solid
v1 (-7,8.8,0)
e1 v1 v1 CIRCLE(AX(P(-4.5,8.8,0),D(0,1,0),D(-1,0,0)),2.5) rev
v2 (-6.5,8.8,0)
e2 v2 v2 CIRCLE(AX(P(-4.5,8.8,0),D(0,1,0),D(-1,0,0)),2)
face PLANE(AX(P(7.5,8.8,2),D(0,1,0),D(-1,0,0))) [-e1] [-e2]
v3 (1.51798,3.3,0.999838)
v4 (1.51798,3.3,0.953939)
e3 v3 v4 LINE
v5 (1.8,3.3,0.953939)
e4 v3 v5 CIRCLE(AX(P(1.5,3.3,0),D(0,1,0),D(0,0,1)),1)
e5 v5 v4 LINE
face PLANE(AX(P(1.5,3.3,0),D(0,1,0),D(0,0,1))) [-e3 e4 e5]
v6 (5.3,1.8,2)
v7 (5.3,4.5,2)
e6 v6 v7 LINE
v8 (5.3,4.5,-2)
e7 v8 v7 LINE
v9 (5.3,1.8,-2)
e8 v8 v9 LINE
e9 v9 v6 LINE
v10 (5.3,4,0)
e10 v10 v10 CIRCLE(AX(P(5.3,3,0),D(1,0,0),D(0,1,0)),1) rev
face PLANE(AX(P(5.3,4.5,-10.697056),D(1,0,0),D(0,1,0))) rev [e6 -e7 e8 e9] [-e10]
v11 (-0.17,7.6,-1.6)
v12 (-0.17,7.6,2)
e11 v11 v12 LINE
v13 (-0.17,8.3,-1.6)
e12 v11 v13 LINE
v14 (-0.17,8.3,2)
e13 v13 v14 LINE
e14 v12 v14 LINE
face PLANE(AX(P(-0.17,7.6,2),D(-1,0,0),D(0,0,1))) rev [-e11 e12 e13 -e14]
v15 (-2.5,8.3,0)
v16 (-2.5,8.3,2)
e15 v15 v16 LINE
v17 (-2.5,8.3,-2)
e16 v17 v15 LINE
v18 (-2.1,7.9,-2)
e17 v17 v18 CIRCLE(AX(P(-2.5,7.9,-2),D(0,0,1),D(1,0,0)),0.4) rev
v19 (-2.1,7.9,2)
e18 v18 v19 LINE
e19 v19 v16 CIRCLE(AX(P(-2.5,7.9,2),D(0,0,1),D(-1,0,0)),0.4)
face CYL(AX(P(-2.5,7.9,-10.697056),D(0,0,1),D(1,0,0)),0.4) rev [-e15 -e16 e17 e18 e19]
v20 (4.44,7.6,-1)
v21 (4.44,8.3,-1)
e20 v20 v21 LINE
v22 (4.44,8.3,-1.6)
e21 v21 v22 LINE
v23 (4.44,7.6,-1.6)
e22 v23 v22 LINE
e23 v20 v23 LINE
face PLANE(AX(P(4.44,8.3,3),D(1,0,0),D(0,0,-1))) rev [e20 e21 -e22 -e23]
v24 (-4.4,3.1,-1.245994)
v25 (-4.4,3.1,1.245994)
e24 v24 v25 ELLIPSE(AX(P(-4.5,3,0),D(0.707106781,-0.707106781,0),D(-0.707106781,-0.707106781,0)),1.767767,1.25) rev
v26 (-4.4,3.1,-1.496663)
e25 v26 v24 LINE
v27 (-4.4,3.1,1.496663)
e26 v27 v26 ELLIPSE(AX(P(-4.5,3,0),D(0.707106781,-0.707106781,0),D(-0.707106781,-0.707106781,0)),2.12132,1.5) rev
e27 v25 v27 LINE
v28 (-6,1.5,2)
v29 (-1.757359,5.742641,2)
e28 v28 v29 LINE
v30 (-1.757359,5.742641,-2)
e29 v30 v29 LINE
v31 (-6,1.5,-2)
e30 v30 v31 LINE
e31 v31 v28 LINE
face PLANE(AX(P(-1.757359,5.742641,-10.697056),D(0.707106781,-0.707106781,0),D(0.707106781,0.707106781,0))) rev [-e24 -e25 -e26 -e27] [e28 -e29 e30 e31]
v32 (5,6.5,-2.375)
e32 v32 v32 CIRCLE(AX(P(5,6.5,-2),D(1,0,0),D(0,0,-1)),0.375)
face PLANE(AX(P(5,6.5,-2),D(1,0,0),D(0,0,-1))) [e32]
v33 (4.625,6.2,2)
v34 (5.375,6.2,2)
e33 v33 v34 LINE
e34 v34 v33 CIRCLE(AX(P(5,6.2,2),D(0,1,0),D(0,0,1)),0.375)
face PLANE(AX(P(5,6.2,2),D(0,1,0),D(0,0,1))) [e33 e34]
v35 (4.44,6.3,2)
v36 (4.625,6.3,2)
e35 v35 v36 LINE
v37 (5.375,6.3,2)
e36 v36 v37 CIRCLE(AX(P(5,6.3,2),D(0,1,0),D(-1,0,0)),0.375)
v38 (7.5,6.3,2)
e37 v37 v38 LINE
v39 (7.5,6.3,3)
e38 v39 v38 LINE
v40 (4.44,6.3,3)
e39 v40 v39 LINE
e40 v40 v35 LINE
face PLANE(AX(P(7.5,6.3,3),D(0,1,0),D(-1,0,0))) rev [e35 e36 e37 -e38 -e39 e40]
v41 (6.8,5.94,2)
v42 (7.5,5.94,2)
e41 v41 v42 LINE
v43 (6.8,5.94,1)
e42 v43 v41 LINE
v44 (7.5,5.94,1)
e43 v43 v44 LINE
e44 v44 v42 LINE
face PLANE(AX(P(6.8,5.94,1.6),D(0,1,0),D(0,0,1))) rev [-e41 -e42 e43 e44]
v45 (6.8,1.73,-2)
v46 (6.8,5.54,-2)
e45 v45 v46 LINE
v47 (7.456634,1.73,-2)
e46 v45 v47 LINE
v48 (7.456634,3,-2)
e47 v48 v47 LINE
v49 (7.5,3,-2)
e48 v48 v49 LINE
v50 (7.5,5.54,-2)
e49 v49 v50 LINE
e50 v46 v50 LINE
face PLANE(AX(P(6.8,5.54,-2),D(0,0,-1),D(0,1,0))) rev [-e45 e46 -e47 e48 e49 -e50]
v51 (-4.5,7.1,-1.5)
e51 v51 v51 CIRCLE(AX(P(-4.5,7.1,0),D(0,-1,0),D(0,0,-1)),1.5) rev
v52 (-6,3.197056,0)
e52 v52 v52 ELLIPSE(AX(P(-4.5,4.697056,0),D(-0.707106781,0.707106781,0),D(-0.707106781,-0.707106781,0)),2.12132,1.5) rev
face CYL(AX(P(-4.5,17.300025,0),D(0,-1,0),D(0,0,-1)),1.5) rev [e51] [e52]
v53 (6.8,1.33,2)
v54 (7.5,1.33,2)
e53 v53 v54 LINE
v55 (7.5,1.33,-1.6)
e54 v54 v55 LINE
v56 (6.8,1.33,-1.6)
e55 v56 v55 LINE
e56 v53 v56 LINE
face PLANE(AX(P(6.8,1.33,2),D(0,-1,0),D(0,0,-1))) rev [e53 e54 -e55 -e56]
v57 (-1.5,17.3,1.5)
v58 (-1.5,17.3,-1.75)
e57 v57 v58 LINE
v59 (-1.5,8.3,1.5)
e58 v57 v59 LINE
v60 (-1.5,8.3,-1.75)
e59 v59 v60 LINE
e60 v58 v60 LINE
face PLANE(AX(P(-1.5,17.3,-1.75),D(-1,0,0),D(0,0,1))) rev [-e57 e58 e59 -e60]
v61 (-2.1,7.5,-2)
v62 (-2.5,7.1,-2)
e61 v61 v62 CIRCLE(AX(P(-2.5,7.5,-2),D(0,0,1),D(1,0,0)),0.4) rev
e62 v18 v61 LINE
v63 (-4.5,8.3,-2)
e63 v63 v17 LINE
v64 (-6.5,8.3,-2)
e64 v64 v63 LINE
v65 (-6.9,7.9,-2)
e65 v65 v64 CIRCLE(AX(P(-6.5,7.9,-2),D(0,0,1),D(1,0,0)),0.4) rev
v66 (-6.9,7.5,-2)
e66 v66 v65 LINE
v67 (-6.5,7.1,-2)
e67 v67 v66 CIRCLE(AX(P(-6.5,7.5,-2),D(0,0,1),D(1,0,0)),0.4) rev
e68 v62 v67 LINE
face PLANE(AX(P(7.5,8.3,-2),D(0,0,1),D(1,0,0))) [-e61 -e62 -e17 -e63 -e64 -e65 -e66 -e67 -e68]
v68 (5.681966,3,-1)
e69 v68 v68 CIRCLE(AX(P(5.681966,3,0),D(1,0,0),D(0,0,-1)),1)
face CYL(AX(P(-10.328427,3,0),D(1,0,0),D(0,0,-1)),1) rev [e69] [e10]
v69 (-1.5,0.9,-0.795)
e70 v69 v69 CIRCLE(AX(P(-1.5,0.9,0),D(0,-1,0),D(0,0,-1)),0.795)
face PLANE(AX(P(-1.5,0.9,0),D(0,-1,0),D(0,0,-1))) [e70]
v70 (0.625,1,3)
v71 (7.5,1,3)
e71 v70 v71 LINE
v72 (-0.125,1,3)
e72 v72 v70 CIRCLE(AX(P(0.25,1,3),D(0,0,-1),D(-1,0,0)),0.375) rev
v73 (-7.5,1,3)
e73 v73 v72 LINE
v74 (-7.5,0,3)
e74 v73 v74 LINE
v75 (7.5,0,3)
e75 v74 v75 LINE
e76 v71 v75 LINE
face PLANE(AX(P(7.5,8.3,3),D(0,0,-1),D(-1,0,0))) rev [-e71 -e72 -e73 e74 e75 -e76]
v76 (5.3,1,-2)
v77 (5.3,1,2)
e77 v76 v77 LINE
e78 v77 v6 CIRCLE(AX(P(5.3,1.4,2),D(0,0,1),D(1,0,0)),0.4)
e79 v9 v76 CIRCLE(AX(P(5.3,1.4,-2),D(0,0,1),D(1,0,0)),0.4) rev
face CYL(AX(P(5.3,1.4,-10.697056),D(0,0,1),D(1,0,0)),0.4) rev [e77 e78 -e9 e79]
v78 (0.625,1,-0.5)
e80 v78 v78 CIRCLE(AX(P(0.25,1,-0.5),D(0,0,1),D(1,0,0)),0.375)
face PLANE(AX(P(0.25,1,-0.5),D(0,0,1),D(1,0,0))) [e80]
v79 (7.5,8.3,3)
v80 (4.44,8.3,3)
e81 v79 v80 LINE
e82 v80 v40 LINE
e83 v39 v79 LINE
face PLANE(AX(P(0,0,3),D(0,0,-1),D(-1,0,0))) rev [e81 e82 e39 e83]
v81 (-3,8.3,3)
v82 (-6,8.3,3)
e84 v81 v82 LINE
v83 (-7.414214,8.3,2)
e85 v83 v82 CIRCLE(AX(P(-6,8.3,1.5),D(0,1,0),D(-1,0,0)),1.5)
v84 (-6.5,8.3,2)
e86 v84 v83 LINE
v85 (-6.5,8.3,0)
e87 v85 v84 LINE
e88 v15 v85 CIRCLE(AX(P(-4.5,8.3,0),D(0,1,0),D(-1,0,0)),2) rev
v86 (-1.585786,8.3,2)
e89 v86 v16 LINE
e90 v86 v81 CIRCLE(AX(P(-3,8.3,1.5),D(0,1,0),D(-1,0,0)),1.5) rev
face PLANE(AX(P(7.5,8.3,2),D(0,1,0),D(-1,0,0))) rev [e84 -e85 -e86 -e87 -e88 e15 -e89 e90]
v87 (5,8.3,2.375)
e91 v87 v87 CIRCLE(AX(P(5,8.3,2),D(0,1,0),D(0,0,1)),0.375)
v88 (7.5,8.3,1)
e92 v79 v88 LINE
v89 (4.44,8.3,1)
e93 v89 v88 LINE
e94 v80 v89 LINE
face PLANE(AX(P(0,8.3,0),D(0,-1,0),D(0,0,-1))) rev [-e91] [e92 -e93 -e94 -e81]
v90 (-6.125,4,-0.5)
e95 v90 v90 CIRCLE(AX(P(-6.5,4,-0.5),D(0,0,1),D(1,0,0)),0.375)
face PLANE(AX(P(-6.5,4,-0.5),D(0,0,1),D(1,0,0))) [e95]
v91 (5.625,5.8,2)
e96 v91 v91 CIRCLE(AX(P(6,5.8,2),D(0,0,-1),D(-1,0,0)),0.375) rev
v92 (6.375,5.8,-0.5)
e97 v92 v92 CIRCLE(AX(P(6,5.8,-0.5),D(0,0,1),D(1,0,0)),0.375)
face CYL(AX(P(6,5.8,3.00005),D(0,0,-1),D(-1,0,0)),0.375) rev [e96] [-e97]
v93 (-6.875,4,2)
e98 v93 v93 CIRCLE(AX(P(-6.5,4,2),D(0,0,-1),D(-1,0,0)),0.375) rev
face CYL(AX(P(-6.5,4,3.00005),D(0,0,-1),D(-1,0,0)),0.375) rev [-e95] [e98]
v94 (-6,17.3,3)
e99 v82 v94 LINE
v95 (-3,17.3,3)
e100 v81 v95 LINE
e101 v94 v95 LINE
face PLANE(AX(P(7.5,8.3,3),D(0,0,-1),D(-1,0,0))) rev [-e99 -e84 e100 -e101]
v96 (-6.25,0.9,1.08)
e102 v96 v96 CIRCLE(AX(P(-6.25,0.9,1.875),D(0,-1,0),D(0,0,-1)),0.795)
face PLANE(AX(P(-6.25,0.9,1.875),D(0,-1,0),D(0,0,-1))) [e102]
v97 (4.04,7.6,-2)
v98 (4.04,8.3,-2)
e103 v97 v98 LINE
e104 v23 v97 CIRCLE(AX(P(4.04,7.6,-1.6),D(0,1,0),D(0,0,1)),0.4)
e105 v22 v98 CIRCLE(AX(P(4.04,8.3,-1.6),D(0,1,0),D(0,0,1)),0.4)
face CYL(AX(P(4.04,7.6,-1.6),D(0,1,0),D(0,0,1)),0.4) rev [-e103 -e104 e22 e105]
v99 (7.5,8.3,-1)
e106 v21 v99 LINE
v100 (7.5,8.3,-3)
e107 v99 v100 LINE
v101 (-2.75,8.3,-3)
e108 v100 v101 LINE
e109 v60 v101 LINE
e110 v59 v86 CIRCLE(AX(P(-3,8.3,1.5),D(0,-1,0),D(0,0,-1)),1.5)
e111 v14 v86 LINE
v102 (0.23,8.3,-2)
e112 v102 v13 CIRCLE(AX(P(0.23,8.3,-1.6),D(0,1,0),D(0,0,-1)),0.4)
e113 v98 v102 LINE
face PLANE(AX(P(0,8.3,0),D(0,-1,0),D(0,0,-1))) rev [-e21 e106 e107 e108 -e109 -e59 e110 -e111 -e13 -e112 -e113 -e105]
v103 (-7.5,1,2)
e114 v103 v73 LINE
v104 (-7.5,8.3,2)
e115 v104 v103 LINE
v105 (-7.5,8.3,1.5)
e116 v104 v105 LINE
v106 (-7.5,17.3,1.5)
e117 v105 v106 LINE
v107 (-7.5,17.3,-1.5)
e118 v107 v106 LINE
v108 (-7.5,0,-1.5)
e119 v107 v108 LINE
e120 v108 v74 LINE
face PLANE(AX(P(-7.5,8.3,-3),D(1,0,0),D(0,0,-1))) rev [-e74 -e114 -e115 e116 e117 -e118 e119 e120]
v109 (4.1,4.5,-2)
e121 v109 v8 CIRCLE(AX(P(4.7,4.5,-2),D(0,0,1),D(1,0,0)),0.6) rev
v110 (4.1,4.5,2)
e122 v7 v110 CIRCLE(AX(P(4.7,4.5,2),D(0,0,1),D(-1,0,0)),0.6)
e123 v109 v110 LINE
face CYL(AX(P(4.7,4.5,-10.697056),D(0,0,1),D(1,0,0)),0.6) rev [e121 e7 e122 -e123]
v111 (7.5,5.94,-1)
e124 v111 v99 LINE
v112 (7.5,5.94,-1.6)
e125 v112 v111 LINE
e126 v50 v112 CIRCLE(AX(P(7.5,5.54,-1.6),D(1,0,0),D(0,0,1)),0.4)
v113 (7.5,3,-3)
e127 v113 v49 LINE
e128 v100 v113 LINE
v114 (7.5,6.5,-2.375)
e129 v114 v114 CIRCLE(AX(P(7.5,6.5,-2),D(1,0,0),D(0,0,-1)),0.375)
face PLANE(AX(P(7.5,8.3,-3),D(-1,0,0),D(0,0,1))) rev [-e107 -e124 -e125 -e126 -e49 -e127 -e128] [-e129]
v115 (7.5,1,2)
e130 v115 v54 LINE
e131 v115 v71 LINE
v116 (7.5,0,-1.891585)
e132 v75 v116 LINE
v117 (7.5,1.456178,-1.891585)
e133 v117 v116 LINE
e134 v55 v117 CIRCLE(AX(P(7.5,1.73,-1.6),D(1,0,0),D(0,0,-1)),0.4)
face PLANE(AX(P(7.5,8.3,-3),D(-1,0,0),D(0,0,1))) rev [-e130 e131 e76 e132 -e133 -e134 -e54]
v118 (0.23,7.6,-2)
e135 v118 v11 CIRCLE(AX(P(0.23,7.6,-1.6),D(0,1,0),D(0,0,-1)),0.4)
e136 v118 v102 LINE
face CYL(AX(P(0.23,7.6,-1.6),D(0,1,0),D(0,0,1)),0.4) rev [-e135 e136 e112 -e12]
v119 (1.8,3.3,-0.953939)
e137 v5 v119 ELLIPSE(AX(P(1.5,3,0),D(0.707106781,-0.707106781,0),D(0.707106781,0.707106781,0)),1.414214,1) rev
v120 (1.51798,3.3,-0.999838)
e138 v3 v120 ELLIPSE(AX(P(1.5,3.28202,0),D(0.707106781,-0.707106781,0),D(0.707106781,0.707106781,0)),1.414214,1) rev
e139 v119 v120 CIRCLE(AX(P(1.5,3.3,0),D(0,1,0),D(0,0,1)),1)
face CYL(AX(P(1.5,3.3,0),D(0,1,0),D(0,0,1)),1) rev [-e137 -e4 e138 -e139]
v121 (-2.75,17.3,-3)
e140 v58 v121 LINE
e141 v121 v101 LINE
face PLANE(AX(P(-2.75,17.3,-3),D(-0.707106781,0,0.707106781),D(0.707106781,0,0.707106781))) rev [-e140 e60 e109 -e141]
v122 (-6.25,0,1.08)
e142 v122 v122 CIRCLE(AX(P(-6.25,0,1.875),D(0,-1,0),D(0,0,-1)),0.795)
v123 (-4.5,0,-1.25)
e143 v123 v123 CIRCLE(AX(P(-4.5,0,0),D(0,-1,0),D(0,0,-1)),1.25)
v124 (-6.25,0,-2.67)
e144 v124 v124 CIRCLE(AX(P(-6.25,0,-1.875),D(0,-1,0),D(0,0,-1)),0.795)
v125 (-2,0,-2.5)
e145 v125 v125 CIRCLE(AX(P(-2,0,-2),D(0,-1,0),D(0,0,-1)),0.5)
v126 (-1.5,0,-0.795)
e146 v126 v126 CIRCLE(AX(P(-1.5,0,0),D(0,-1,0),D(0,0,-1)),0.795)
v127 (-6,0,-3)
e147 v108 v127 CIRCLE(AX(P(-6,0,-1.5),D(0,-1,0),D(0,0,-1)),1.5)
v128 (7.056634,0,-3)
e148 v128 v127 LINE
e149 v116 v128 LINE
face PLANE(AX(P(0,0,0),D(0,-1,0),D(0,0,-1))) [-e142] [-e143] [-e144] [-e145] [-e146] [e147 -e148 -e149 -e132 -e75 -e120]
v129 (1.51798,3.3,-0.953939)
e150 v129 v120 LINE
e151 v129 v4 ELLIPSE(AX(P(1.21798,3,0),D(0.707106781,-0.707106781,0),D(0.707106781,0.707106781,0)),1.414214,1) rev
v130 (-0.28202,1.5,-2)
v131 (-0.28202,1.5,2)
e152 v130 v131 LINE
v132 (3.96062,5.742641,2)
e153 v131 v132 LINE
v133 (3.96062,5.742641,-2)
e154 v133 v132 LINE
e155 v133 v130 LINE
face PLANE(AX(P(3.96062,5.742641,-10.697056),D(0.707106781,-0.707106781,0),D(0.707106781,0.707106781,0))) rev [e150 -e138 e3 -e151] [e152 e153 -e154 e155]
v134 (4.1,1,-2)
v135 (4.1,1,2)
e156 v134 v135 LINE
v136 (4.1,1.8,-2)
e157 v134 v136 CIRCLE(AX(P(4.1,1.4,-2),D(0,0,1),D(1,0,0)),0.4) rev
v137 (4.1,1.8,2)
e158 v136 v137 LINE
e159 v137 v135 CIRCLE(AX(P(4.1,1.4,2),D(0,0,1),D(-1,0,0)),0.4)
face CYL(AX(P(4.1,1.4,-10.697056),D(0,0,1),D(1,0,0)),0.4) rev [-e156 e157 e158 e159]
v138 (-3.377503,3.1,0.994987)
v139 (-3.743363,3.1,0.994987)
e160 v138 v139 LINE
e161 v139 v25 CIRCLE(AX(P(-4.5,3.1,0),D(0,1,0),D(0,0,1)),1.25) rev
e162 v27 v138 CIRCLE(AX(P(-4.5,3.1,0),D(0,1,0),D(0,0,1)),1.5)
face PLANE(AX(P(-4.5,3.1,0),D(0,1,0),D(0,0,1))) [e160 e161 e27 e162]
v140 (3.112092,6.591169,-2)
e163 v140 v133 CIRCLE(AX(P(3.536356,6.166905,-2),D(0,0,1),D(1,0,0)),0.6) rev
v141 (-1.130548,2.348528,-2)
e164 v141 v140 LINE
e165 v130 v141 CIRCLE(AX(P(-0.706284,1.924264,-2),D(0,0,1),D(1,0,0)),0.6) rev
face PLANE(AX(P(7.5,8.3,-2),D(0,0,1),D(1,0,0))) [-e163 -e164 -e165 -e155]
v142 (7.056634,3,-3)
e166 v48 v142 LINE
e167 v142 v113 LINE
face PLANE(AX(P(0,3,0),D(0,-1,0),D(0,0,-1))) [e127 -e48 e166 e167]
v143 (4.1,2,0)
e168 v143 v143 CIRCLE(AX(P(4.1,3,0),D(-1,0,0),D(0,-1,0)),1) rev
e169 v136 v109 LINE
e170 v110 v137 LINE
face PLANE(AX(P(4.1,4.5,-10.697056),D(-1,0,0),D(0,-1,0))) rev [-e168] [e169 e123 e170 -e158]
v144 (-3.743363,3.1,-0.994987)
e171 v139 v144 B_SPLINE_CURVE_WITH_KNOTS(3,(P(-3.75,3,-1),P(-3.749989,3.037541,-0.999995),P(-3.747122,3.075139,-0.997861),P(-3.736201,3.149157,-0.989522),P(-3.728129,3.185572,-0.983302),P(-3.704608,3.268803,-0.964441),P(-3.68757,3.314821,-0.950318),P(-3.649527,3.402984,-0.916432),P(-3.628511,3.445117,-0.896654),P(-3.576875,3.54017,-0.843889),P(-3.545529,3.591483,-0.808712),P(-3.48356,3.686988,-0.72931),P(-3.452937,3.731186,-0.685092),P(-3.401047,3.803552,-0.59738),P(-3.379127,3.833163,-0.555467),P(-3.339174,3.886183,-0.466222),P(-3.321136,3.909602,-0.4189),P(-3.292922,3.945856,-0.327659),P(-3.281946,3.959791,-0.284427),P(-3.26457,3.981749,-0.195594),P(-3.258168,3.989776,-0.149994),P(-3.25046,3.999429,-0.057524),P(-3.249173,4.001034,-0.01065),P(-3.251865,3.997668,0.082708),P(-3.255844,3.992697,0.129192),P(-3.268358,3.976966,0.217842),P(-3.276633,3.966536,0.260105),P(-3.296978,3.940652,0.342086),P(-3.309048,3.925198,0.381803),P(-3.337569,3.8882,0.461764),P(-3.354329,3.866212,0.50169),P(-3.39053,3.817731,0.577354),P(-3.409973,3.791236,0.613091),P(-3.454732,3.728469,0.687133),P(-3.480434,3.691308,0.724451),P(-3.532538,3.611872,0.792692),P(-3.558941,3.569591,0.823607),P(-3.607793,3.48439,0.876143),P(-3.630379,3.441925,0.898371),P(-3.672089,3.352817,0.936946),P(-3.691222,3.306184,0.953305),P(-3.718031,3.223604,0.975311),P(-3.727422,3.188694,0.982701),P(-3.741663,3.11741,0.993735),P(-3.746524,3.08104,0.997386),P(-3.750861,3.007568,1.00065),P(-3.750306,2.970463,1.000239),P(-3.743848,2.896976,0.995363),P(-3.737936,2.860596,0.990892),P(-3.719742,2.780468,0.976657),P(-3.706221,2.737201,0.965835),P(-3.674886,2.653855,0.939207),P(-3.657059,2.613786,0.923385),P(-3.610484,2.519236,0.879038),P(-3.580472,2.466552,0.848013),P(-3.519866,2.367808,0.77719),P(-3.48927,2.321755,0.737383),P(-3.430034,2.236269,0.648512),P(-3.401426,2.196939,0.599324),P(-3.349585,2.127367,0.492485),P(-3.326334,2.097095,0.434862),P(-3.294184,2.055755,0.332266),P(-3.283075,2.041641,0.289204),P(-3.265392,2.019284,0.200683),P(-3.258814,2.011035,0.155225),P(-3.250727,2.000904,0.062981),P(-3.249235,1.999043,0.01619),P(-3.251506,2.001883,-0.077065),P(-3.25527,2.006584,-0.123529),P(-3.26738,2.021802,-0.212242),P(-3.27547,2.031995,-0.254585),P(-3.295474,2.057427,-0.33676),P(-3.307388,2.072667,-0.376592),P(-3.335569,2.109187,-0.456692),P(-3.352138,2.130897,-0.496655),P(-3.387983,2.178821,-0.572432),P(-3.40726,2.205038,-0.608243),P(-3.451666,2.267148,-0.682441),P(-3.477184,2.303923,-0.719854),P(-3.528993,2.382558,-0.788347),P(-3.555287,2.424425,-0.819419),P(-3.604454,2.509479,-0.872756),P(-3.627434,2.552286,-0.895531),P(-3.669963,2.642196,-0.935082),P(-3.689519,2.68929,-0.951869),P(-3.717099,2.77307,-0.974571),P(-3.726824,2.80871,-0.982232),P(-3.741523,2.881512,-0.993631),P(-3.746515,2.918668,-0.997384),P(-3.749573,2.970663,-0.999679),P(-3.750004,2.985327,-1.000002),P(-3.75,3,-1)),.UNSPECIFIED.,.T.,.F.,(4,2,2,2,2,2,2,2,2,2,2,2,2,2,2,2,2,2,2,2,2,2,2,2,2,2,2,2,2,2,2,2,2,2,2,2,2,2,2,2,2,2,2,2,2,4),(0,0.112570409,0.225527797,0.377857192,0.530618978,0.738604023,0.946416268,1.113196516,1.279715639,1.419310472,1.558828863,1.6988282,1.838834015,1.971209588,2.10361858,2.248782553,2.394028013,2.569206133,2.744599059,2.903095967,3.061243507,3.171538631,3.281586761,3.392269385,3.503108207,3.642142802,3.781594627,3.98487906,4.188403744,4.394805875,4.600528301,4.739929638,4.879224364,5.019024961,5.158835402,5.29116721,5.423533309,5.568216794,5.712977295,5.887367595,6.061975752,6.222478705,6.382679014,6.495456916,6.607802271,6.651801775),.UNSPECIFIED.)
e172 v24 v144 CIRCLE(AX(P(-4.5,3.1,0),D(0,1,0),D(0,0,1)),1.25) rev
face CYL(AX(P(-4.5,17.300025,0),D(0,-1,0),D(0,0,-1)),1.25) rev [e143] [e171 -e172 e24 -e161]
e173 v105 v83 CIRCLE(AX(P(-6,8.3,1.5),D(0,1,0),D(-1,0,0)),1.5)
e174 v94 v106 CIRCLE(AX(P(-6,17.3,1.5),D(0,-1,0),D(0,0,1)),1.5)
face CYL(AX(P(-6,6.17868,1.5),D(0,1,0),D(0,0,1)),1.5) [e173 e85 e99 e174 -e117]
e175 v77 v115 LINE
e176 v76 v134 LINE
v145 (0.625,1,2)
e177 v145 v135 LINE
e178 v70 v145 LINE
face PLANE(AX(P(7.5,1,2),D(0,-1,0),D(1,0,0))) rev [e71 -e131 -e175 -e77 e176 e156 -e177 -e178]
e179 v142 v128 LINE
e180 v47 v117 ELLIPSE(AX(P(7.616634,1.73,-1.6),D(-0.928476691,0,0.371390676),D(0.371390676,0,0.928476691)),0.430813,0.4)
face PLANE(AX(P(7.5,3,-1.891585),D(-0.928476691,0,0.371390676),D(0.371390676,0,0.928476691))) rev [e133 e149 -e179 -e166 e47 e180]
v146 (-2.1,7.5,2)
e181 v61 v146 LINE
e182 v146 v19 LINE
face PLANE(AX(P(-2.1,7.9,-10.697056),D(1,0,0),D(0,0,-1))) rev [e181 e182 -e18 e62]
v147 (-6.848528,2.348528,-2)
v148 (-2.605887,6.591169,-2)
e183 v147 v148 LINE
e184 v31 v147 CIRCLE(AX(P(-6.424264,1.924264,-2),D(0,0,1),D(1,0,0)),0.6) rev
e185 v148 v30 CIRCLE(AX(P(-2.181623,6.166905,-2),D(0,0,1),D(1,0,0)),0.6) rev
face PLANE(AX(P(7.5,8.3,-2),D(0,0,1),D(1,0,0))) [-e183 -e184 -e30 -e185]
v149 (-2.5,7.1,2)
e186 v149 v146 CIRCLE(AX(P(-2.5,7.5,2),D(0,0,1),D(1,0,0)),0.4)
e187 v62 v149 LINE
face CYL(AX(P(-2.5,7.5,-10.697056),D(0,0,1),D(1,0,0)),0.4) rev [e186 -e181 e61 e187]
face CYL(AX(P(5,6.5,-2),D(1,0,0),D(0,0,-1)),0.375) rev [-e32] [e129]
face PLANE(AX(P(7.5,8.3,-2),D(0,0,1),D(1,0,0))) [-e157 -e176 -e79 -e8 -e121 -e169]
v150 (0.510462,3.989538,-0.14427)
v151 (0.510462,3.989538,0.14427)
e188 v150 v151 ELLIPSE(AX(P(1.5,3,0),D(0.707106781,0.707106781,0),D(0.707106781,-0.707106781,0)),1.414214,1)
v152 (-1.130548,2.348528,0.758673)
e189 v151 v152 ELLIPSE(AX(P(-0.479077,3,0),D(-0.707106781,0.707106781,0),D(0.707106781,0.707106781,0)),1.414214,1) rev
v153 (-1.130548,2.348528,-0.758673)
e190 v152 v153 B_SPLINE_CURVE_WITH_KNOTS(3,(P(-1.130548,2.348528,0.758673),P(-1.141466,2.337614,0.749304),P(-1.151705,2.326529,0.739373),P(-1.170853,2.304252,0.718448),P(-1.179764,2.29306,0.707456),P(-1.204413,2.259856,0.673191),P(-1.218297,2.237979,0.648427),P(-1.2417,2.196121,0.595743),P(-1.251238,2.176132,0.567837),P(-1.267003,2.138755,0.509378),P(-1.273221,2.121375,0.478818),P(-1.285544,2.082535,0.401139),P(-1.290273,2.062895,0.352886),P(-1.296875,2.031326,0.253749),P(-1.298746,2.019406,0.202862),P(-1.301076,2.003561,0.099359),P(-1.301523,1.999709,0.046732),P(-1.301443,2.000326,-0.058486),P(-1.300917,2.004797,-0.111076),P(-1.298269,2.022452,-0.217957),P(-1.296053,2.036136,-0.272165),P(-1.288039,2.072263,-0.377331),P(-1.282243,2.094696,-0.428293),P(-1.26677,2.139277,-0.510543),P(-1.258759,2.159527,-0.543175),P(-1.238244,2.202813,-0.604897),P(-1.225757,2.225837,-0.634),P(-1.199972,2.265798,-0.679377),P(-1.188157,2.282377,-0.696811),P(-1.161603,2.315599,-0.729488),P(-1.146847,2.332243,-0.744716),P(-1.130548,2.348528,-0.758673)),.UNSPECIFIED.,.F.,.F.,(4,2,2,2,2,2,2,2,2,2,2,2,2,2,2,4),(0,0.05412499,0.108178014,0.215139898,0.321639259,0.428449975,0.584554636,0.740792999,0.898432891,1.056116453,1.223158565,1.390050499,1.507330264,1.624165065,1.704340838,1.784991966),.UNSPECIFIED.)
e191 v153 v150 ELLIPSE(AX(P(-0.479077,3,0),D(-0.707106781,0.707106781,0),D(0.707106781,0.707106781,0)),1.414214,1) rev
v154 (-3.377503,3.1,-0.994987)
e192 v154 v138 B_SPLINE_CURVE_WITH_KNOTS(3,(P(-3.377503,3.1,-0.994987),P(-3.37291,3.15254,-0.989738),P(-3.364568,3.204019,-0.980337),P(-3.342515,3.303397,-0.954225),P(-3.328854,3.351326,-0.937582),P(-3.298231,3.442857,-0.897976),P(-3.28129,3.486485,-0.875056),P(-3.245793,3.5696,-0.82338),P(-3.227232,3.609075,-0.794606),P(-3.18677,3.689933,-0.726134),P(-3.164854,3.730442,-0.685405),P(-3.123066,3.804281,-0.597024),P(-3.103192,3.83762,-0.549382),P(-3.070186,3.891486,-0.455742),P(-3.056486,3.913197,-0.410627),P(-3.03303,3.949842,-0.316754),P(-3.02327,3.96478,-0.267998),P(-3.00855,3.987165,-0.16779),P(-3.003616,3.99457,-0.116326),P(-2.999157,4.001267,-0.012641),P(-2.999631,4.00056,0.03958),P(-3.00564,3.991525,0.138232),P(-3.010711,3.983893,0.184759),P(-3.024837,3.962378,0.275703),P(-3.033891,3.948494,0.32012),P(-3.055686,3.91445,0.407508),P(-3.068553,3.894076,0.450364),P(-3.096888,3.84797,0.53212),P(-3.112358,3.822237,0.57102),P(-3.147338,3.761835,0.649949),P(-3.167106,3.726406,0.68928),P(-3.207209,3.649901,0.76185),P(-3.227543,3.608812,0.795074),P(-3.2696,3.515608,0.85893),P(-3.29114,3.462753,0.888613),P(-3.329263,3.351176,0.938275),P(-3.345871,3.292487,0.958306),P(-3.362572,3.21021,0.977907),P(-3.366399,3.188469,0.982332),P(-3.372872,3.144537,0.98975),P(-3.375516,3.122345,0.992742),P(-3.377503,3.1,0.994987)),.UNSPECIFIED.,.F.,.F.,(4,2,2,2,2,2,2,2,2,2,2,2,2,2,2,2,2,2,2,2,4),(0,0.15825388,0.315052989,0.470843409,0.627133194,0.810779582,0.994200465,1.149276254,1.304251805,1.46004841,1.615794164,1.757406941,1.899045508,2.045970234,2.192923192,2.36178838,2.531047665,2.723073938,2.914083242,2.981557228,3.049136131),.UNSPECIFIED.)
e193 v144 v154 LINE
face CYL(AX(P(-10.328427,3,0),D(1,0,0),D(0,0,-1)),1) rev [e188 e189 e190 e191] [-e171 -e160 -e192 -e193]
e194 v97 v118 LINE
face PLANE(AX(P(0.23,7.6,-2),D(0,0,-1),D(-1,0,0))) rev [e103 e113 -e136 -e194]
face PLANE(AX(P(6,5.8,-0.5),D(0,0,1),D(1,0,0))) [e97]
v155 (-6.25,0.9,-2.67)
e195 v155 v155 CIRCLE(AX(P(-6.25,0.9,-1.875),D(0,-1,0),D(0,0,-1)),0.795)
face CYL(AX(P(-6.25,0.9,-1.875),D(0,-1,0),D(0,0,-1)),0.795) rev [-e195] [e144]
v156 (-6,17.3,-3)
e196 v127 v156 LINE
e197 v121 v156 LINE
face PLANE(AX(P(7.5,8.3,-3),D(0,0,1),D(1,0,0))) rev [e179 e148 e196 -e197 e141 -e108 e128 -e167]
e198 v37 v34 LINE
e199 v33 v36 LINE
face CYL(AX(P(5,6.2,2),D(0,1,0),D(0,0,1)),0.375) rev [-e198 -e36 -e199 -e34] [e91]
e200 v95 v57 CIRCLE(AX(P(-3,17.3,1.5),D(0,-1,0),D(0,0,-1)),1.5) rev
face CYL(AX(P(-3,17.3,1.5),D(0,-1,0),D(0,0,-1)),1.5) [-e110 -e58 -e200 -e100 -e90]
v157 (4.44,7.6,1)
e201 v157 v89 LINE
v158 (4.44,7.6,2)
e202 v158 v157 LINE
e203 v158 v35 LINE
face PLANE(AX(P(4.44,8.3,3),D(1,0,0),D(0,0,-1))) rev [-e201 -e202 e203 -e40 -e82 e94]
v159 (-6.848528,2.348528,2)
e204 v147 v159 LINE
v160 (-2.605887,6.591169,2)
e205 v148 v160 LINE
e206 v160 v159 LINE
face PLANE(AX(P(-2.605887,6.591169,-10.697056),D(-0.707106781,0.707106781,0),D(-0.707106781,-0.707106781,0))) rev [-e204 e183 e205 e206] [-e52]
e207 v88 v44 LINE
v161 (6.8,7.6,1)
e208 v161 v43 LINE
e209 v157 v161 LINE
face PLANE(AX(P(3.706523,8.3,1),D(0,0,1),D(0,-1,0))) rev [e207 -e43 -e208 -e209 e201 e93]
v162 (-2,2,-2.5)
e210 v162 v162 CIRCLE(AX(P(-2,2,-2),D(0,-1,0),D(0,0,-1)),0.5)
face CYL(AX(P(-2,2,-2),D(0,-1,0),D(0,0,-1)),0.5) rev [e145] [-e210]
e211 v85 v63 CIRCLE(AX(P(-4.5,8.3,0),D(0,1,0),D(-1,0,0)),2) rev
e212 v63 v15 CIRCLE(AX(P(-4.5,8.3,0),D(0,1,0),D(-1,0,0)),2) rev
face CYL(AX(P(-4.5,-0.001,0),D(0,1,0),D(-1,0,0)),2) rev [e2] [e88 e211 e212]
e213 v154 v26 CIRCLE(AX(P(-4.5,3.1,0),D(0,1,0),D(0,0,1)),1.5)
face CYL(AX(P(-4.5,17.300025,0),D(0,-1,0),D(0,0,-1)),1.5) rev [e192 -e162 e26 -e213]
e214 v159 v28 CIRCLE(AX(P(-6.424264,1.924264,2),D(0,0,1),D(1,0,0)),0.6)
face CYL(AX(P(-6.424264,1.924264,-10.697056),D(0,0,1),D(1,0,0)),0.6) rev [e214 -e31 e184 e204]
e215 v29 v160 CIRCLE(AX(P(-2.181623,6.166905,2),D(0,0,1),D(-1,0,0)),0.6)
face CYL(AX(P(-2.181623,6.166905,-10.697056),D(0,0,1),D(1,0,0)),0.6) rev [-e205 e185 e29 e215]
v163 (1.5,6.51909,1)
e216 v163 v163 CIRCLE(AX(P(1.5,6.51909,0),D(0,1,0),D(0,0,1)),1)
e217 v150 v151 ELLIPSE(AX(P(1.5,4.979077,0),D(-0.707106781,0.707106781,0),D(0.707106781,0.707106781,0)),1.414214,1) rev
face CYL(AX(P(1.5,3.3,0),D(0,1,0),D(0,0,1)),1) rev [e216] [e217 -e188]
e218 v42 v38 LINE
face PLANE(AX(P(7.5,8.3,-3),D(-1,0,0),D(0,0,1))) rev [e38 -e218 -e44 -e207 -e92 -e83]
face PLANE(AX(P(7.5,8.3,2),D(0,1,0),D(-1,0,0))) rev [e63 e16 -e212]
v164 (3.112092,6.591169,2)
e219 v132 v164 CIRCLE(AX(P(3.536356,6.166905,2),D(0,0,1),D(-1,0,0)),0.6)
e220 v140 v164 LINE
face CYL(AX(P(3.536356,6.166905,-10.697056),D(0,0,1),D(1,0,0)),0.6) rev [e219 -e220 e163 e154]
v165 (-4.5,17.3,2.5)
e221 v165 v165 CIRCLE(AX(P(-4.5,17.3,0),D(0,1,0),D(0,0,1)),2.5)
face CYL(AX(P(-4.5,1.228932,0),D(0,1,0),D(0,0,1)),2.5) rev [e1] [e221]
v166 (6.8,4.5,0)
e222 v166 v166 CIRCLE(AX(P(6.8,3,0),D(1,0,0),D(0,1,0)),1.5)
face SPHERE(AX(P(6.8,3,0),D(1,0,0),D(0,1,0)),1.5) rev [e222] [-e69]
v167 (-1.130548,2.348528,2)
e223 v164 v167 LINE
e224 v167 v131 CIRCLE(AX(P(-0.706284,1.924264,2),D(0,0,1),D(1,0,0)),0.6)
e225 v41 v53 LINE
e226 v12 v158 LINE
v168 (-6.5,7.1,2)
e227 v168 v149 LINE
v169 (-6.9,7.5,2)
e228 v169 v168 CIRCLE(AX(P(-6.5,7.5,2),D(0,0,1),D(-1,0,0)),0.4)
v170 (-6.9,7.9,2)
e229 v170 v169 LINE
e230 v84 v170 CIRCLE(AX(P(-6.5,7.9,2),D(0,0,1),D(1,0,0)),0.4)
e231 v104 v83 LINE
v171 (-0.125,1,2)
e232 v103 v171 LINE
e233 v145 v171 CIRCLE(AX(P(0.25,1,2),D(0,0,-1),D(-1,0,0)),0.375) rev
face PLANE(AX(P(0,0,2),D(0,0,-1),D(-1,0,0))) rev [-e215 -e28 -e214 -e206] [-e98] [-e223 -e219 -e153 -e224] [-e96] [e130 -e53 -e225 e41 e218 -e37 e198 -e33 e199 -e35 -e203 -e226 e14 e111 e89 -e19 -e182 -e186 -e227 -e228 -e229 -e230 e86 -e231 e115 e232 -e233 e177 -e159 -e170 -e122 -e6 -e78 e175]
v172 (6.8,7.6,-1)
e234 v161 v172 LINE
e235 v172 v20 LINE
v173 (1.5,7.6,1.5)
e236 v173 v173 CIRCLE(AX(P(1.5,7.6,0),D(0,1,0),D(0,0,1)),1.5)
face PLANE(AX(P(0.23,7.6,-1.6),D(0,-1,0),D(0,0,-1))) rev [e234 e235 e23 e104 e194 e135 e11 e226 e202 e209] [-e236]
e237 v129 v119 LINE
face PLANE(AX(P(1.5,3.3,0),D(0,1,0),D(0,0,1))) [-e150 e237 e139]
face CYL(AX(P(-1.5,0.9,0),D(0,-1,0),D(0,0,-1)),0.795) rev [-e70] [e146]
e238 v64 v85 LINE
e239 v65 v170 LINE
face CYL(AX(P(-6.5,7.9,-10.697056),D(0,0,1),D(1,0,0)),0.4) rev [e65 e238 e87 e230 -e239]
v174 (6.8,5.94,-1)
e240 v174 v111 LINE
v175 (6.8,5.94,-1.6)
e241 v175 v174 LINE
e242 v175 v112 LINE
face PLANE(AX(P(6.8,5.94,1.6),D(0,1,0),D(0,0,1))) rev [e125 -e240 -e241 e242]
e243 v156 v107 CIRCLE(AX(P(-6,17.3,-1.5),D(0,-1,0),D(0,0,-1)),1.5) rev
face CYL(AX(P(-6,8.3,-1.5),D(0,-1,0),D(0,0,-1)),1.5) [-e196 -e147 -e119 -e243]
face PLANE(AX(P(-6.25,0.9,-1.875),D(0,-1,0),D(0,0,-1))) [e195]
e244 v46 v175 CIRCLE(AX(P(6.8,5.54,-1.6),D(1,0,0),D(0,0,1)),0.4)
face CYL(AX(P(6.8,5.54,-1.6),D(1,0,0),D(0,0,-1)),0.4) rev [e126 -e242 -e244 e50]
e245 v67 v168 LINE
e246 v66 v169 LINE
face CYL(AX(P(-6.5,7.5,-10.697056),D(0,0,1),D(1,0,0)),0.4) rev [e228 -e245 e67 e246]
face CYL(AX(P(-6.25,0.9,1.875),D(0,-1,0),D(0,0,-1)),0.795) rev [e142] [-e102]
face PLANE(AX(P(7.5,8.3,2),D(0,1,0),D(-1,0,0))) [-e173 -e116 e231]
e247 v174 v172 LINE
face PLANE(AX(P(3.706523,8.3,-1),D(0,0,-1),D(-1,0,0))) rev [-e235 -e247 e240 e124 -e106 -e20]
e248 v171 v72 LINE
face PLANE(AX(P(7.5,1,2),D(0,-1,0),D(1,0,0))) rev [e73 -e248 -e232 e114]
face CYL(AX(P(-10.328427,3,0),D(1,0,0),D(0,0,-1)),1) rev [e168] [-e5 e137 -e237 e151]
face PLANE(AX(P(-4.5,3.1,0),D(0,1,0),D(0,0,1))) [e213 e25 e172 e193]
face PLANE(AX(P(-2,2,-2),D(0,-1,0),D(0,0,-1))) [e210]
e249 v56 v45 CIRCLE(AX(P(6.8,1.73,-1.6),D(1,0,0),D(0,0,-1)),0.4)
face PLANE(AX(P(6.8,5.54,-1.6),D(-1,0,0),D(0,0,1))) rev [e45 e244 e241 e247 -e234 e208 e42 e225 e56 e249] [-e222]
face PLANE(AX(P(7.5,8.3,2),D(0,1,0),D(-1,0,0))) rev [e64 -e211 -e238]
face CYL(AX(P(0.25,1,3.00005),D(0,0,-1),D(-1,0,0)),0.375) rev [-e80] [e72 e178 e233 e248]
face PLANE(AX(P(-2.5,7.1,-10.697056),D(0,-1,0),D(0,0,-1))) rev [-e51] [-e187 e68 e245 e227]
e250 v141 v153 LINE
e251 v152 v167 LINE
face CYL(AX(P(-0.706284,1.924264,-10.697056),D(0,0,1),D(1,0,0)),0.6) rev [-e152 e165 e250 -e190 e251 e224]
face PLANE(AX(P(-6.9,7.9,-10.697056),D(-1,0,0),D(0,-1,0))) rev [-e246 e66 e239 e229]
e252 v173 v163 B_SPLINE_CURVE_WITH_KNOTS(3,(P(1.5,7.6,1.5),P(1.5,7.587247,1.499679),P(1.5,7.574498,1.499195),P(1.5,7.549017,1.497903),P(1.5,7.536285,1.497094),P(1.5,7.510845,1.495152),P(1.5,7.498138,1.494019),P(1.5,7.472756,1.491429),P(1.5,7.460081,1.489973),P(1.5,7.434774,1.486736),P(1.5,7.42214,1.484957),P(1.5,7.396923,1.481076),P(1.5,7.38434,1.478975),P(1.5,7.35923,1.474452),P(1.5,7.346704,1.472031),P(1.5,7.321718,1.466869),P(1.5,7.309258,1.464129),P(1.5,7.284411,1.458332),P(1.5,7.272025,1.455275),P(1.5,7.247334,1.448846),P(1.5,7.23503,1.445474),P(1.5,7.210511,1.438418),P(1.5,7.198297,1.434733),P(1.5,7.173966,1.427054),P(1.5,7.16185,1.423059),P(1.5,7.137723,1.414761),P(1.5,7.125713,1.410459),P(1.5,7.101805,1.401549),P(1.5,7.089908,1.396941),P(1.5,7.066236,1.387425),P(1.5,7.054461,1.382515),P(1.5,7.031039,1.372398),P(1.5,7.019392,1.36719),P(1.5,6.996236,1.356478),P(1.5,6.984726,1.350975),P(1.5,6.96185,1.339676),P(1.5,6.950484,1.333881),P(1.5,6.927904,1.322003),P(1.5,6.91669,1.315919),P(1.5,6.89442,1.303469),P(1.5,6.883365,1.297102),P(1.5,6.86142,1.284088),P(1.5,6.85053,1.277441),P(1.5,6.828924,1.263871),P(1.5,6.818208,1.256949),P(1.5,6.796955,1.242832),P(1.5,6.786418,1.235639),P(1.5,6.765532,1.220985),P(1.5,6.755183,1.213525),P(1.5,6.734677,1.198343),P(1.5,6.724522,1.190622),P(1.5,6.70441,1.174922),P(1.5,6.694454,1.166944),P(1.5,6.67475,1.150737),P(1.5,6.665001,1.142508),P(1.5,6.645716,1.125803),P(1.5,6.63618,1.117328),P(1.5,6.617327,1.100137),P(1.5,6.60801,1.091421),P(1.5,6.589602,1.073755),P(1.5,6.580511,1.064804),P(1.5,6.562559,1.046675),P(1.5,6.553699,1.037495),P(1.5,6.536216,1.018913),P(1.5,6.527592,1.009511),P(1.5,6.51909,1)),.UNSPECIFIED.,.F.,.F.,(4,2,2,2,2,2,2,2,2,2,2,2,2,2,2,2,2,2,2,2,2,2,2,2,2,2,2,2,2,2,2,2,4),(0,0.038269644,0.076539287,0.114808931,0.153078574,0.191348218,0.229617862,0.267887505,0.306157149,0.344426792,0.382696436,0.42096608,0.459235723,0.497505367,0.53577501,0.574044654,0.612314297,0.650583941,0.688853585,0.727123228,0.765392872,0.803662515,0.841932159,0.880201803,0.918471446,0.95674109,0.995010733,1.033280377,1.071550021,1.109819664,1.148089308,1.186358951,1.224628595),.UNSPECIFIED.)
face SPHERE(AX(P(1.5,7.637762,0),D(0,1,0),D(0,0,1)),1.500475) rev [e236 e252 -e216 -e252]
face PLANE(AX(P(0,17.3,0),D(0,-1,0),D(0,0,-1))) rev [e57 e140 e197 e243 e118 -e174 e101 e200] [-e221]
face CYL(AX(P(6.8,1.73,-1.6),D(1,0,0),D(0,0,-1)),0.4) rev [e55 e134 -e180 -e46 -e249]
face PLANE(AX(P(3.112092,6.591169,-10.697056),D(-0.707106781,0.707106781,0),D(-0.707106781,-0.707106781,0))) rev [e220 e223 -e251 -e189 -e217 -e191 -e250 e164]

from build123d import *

# Parameters (mm, degrees)
SKETCH1_W                        = 15
SKETCH1_H                        = 6
MAIN_BODY_EXT_DEPTH              = 8.3
EMISSION_PATH_EXT_DEPTH          = 9
SKETCH3_R                        = 1.25
EMISSION_AND_GRIN_CUT_DEPTH      = 20.092931
SKETCH4_R                        = 1
DRUM_LENS_CUT_DEPTH              = 13
SKETCH41_R                       = 1
ADDTL_LIGHT_SOURCE_DEPTH         = 5
SKETCH5_W                        = 15
SKETCH5_H                        = 7.3
FILTERCOVER_CUT1_DEPTH           = 1
TOP_LED_SCREW_W                  = 3.06
TOP_LED_SCREW_H                  = 2
BOSS_EXTRUDE1_DEPTH              = 1
FILTERSET_CUT2_DEPTH             = 4
SKETCH10_R                       = 2.5
EMISSION_LENS_CUT_DEPTH          = 8.5
SKETCH15_R                       = 0.795
MAGNETS_CUT_DEPTH                = 0.9
SCREW_HOLES_CUT_DEPTH            = 20.507434
SCREW_HOLES_CUT_DEPTH_BACK       = 2.5
SKETCH18_R                       = 0.375
EXTERNAL_FILLET_1_R              = 1.5
VERTICAL_PATH_CUT_DEPTH          = 14.011149
VERTICAL_PATH_CUT_DEPTH_BACK     = 4
SKETCH28_R                       = 1.5
SET_SCREW_NOTCH_DEPTH            = 3
CUT_EXTRUDE_ORIGINAL_LIGHT_DEPTH = 0.7
CUT_EXTRUDE_ADDTL_LIGHT_DEPTH    = 0.7
SKETCH29_R                       = 0.375
SIDE_LED_SCREW_DEPTH             = 2.5
SKETCH32_W                       = 2
SKETCH32_H                       = 2.36
SIDE_WIRE_SLOT_CUT_DEPTH         = 0.7
SKETCH45_W                       = 2.36
SKETCH45_H                       = 2
TOP_LED_SLOT_DEPTH               = 0.7
CUT_EXTRUDE16_DEPTH              = 9
CUT_EXTRUDE17_REACH              = 13.945
SKETCH37_R                       = 2
SKETCH48_R                       = 0.5
PEG_EXTRUDE_DEPTH                = 2
SKETCH51_R                       = 0.375
TOP_LE_SCREW_DEPTH               = 2.1


with BuildPart() as part:
    # Sketch1 → Main Body Ext (new body)
    with BuildSketch(Plane(origin=(0, 0, 0), x_dir=(1, 0, 0), z_dir=(0, 1, 0))):
        Rectangle(SKETCH1_W, SKETCH1_H)
    extrude(amount=MAIN_BODY_EXT_DEPTH)

    # Sketch8 → Emission Path Ext (add)
    with BuildSketch(Plane(origin=(0, 8.3, 0), x_dir=(1, 0, 0), z_dir=(0, 1, 0))):
        Polygon((-2.75, 3), (-1.5, 1.75), (-1.5, -3), (-7.5, -3), (-7.5, 3), align=None)
    extrude(amount=EMISSION_PATH_EXT_DEPTH)

    # Sketch3 → Emission and Grin Cut (cut, through all)
    with BuildSketch(Plane.XZ):
        with Locations(Location((-4.5, 0, 0), (0, 0, 270))):
            Circle(SKETCH3_R)
    extrude(amount=-EMISSION_AND_GRIN_CUT_DEPTH, mode=Mode.SUBTRACT)

    # Sketch4 → Drum Lens Cut (cut)
    with BuildSketch(Plane(origin=(7.5, 0, 0), x_dir=(0, 0, -1), z_dir=(1, 0, 0))):
        with Locations((0, 3)):
            Circle(SKETCH4_R)
    extrude(amount=-DRUM_LENS_CUT_DEPTH, mode=Mode.SUBTRACT)

    # Sketch41 → Addtl Light Source (cut)
    with BuildSketch(Plane(origin=(0, 8.3, 0), x_dir=(1, 0, 0), z_dir=(0, 1, 0))):
        with Locations(Location((1.5, 0, 0), (0, 0, 270))):
            Circle(SKETCH41_R)
    extrude(amount=-ADDTL_LIGHT_SOURCE_DEPTH, mode=Mode.SUBTRACT)

    # Sketch5 → FilterCover Cut1 (cut)
    with BuildSketch(Plane.XY.offset(3)):
        with Locations((0, 4.65)):
            Rectangle(SKETCH5_W, SKETCH5_H)
    extrude(amount=-FILTERCOVER_CUT1_DEPTH, mode=Mode.SUBTRACT)

    # Top-LED-Screw → Boss-Extrude1 (add)
    with BuildSketch(Plane.XY.offset(2)):
        with Locations((5.97, 7.3)):
            Rectangle(TOP_LED_SCREW_W, TOP_LED_SCREW_H)
    extrude(amount=BOSS_EXTRUDE1_DEPTH)

    # Sketch6 → FilterSet Cut2 (cut)
    with BuildSketch(Plane.XY.offset(2)):
        with BuildLine():
            Line((5.3, 4.5), (5.3, 1.8))
            ThreePointArc((5.3, 1.8), (5.7, 1.4), (5.3, 1))
            Line((5.3, 1), (4.1, 1))
            ThreePointArc((4.1, 1), (3.7, 1.4), (4.1, 1.8))
            Line((4.1, 1.8), (4.1, 4.5))
            ThreePointArc((4.1, 4.5), (4.7, 5.1), (5.3, 4.5))
        make_face()
        with BuildLine():
            Line((-6.9, 7.9), (-6.9, 7.5))
            ThreePointArc((-6.9, 7.5), (-6.782843, 7.217157), (-6.5, 7.1))
            Line((-6.5, 7.1), (-2.5, 7.1))
            ThreePointArc((-2.5, 7.1), (-2.217157, 7.217157), (-2.1, 7.5))
            Line((-2.1, 7.5), (-2.1, 7.9))
            ThreePointArc((-2.1, 7.9), (-2.217157, 8.182843), (-2.5, 8.3))
            Line((-2.5, 8.3), (-6.5, 8.3))
            ThreePointArc((-6.5, 8.3), (-6.782843, 8.182843), (-6.9, 7.9))
        make_face()
        with BuildLine():
            Line((-2.605887, 6.591169), (-6.848528, 2.348528))
            ThreePointArc((-6.848528, 2.348528), (-6.848528, 1.5), (-6, 1.5))
            Line((-6, 1.5), (-1.757359, 5.742641))
            ThreePointArc((-1.757359, 5.742641), (-1.757359, 6.591169), (-2.605887, 6.591169))
        make_face()
        with BuildLine():
            Line((3.112092, 6.591169), (-1.130548, 2.348528))
            ThreePointArc((-1.130548, 2.348528), (-1.130548, 1.5), (-0.28202, 1.5))
            Line((-0.28202, 1.5), (3.96062, 5.742641))
            ThreePointArc((3.96062, 5.742641), (3.96062, 6.591169), (3.112092, 6.591169))
        make_face()
    extrude(amount=-FILTERSET_CUT2_DEPTH, mode=Mode.SUBTRACT)

    # Sketch10 → Emission Lens Cut (cut)
    with BuildSketch(Plane(origin=(0, 17.3, 0), x_dir=(1, 0, 0), z_dir=(0, 1, 0))):
        with Locations(Location((-4.5, 0, 0), (0, 0, 270))):
            Circle(SKETCH10_R)
    extrude(amount=-EMISSION_LENS_CUT_DEPTH, mode=Mode.SUBTRACT)

    # Sketch15 → Magnets Cut (cut)
    with BuildSketch(Plane.XZ):
        with Locations(Location((-6.25, -1.875, 0), (0, 0, 270))):
            Circle(SKETCH15_R)
        with Locations(Location((-6.25, 1.875, 0), (0, 0, 270))):
            Circle(SKETCH15_R)
        with Locations(Location((-1.5, 0, 0), (0, 0, 270))):
            Circle(SKETCH15_R)
    extrude(amount=-MAGNETS_CUT_DEPTH, mode=Mode.SUBTRACT)

    # Sketch18 → Screw Holes Cut (cut, two sides: drawn at the far end of the back side and taken through both)
    with BuildSketch(Plane.XY.offset(2).offset(-SCREW_HOLES_CUT_DEPTH_BACK)):
        with Locations(Location((-6.5, 4, 0), (0, 0, 180))):
            Circle(SKETCH18_R)
        with Locations(Location((6, 5.8, 0), (0, 0, 180))):
            Circle(SKETCH18_R)
        with Locations((0.25, 1)):
            Circle(SKETCH18_R)
    extrude(amount=SCREW_HOLES_CUT_DEPTH + SCREW_HOLES_CUT_DEPTH_BACK, mode=Mode.SUBTRACT)

    # External Fillet 1
    # the kernel refuses this fillet: 1.5 mm, written as the material it takes off along each edge
    with BuildSketch(Plane(origin=(-7.5, -3.75, -3), x_dir=(1, 0, 0), z_dir=(0, 1, 0))) as external_fillet_1_piece_1:
        with BuildLine():
            CenterArc((EXTERNAL_FILLET_1_R, -EXTERNAL_FILLET_1_R), EXTERNAL_FILLET_1_R, 90, 90)
            Line((0, -EXTERNAL_FILLET_1_R), (0, 0))
            Line((0, 0), (EXTERNAL_FILLET_1_R, 0))
        make_face()
    extrude(amount=24.8, mode=Mode.SUBTRACT)
    with BuildSketch(Plane(origin=(-1.5, 8.3, 3), x_dir=(0, 0, -1), z_dir=(0, 1, 0))) as external_fillet_1_piece_2:
        with BuildLine():
            CenterArc((EXTERNAL_FILLET_1_R, EXTERNAL_FILLET_1_R), EXTERNAL_FILLET_1_R, 180, 90)
            Line((0, EXTERNAL_FILLET_1_R), (0, 0))
            Line((0, 0), (EXTERNAL_FILLET_1_R, 0))
        make_face()
    extrude(amount=12.75, mode=Mode.SUBTRACT)

    # Sketch28 → Vertical-Path-Cut (cut, two sides: drawn at the far end of the back side and taken through both)
    with BuildSketch(Plane(origin=(0, 7.1, 0), x_dir=(1, 0, 0), z_dir=(0, 1, 0)).offset(-VERTICAL_PATH_CUT_DEPTH_BACK)):
        with Locations(Location((-4.5, 0, 0), (0, 0, 180))):
            Circle(SKETCH28_R)
    extrude(amount=VERTICAL_PATH_CUT_DEPTH + VERTICAL_PATH_CUT_DEPTH_BACK, mode=Mode.SUBTRACT)

    # Sketch14 → Set-Screw-Notch (cut)
    with BuildSketch(Plane.XZ):
        Polygon((7.5, -3), (7.5, -1.891585), (7.056634, -3), align=None)
    extrude(amount=-SET_SCREW_NOTCH_DEPTH, mode=Mode.SUBTRACT)

    # Sketch12 → Cut-Extrude Original Light (cut)
    with BuildSketch(Plane(origin=(7.5, 0, 0), x_dir=(0, 0, -1), z_dir=(1, 0, 0))):
        with BuildLine():
            Line((1.6, 5.94), (-1.6, 5.94))
            Line((-1.6, 5.94), (-2, 5.94))
            Line((-2, 5.94), (-2, 1.33))
            Line((-2, 1.33), (1.6, 1.33))
            ThreePointArc((1.6, 1.33), (1.882843, 1.447157), (2, 1.73))
            Line((2, 1.73), (2, 5.54))
            ThreePointArc((2, 5.54), (1.882843, 5.822843), (1.6, 5.94))
        make_face()
    extrude(amount=-CUT_EXTRUDE_ORIGINAL_LIGHT_DEPTH, mode=Mode.SUBTRACT)

    # Sketch44 → Cut-Extrude Addtl Light (cut)
    with BuildSketch(Plane(origin=(0, 8.3, 0), x_dir=(1, 0, 0), z_dir=(0, 1, 0))):
        with BuildLine():
            Line((-0.17, -2), (4.44, -2))
            Line((4.44, -2), (4.44, 1.6))
            ThreePointArc((4.44, 1.6), (4.322843, 1.882843), (4.04, 2))
            Line((4.04, 2), (0.23, 2))
            ThreePointArc((0.23, 2), (-0.052843, 1.882843), (-0.17, 1.6))
            Line((-0.17, 1.6), (-0.17, -2))
        make_face()
    extrude(amount=-CUT_EXTRUDE_ADDTL_LIGHT_DEPTH, mode=Mode.SUBTRACT)

    # Sketch29 → Side-LED-Screw (cut)
    with BuildSketch(Plane(origin=(7.5, 0, 0), x_dir=(0, 0, -1), z_dir=(1, 0, 0))):
        with Locations((2, 6.5)):
            Circle(SKETCH29_R)
    extrude(amount=-SIDE_LED_SCREW_DEPTH, mode=Mode.SUBTRACT)

    # Sketch32 → Side-Wire-Slot-Cut (cut)
    with BuildSketch(Plane(origin=(7.5, 0, 0), x_dir=(0, 0, -1), z_dir=(1, 0, 0))):
        with Locations((0, 7.12)):
            Rectangle(SKETCH32_W, SKETCH32_H)
    extrude(amount=-SIDE_WIRE_SLOT_CUT_DEPTH, mode=Mode.SUBTRACT)

    # Sketch45 → Top-LED-slot (cut)
    with BuildSketch(Plane(origin=(0, 8.3, 0), x_dir=(1, 0, 0), z_dir=(0, 1, 0))):
        with Locations((5.62, 0)):
            Rectangle(SKETCH45_W, SKETCH45_H)
    extrude(amount=-TOP_LED_SLOT_DEPTH, mode=Mode.SUBTRACT)

    # Sketch33 → Side-BallLens_Cut (revolve, cut)
    with BuildSketch(Plane.XY, mode=Mode.PRIVATE) as side_balllens_cut_sk:
        with BuildLine():
            Line((6.8, 3), (5.3, 3))
            ThreePointArc((5.3, 3), (5.73934, 4.06066), (6.8, 4.5))
            Line((6.8, 4.5), (6.8, 3))
        make_face()
    revolve(side_balllens_cut_sk.sketch.rotate(Axis((6.8, 3, 0), (-1, 0, 0)), 84.26086), axis=Axis((6.8, 3, 0), (-1, 0, 0)), mode=Mode.SUBTRACT)

    # Sketch47 → Top-BallLens_Cut (revolve, cut)
    with BuildSketch(Plane(origin=(1.5, 0, 0), x_dir=(0, 0, -1), z_dir=(1, 0, 0))):
        with BuildLine():
            Line((-1.5, 7.6), (0, 7.6))
            Line((0, 7.6), (0, 6.137287))
            ThreePointArc((0, 6.137287), (-1.04756, 6.563498), (-1.5, 7.6))
        make_face()
    revolve(axis=Axis((1.5, 7.6, 0), (0, -1, 0)), mode=Mode.SUBTRACT)

    # Sketch36 → Cut-Extrude16 (cut)
    with BuildSketch(Plane(origin=(0, 17.3, 0), x_dir=(1, 0, 0), z_dir=(0, 1, 0))):
        with BuildLine():
            Line((-7.5, -1.5), (-7.5, -3))
            Line((-7.5, -3), (-6, -3))
            ThreePointArc((-6, -3), (-7.06066, -2.56066), (-7.5, -1.5))
        make_face()
    extrude(amount=-CUT_EXTRUDE16_DEPTH, mode=Mode.SUBTRACT)

    # Sketch37 → Cut-Extrude17 (cut, up to next)
    with BuildSketch(Plane(origin=(0, 8.8, 0), x_dir=(1, 0, 0), z_dir=(0, 1, 0)), mode=Mode.PRIVATE) as cut_extrude17_sk1:
        with Locations(Location((-4.5, 0, 0), (0, 0, 180))):
            Circle(SKETCH37_R)
    cut_extrude17_tool1 = extrude(cut_extrude17_sk1.sketch, amount=-CUT_EXTRUDE17_REACH, mode=Mode.PRIVATE) & part.part
    add(cut_extrude17_tool1.solids().sort_by_distance((-4.5, 8.8, 0))[0], mode=Mode.SUBTRACT)

    # Sketch48 → Peg-extrude (cut)
    with BuildSketch(Plane.XZ):
        with Locations(Location((-2, -2, 0), (0, 0, 270))):
            Circle(SKETCH48_R)
    extrude(amount=-PEG_EXTRUDE_DEPTH, mode=Mode.SUBTRACT)

    # Sketch51 → Top-LE-Screw (cut)
    with BuildSketch(Plane(origin=(0, 8.3, 0), x_dir=(1, 0, 0), z_dir=(0, 1, 0))):
        with Locations(Location((5, -2, 0), (0, 0, 270))):
            Circle(SKETCH51_R)
    extrude(amount=-TOP_LE_SCREW_DEPTH, mode=Mode.SUBTRACT)


solid = part.part
